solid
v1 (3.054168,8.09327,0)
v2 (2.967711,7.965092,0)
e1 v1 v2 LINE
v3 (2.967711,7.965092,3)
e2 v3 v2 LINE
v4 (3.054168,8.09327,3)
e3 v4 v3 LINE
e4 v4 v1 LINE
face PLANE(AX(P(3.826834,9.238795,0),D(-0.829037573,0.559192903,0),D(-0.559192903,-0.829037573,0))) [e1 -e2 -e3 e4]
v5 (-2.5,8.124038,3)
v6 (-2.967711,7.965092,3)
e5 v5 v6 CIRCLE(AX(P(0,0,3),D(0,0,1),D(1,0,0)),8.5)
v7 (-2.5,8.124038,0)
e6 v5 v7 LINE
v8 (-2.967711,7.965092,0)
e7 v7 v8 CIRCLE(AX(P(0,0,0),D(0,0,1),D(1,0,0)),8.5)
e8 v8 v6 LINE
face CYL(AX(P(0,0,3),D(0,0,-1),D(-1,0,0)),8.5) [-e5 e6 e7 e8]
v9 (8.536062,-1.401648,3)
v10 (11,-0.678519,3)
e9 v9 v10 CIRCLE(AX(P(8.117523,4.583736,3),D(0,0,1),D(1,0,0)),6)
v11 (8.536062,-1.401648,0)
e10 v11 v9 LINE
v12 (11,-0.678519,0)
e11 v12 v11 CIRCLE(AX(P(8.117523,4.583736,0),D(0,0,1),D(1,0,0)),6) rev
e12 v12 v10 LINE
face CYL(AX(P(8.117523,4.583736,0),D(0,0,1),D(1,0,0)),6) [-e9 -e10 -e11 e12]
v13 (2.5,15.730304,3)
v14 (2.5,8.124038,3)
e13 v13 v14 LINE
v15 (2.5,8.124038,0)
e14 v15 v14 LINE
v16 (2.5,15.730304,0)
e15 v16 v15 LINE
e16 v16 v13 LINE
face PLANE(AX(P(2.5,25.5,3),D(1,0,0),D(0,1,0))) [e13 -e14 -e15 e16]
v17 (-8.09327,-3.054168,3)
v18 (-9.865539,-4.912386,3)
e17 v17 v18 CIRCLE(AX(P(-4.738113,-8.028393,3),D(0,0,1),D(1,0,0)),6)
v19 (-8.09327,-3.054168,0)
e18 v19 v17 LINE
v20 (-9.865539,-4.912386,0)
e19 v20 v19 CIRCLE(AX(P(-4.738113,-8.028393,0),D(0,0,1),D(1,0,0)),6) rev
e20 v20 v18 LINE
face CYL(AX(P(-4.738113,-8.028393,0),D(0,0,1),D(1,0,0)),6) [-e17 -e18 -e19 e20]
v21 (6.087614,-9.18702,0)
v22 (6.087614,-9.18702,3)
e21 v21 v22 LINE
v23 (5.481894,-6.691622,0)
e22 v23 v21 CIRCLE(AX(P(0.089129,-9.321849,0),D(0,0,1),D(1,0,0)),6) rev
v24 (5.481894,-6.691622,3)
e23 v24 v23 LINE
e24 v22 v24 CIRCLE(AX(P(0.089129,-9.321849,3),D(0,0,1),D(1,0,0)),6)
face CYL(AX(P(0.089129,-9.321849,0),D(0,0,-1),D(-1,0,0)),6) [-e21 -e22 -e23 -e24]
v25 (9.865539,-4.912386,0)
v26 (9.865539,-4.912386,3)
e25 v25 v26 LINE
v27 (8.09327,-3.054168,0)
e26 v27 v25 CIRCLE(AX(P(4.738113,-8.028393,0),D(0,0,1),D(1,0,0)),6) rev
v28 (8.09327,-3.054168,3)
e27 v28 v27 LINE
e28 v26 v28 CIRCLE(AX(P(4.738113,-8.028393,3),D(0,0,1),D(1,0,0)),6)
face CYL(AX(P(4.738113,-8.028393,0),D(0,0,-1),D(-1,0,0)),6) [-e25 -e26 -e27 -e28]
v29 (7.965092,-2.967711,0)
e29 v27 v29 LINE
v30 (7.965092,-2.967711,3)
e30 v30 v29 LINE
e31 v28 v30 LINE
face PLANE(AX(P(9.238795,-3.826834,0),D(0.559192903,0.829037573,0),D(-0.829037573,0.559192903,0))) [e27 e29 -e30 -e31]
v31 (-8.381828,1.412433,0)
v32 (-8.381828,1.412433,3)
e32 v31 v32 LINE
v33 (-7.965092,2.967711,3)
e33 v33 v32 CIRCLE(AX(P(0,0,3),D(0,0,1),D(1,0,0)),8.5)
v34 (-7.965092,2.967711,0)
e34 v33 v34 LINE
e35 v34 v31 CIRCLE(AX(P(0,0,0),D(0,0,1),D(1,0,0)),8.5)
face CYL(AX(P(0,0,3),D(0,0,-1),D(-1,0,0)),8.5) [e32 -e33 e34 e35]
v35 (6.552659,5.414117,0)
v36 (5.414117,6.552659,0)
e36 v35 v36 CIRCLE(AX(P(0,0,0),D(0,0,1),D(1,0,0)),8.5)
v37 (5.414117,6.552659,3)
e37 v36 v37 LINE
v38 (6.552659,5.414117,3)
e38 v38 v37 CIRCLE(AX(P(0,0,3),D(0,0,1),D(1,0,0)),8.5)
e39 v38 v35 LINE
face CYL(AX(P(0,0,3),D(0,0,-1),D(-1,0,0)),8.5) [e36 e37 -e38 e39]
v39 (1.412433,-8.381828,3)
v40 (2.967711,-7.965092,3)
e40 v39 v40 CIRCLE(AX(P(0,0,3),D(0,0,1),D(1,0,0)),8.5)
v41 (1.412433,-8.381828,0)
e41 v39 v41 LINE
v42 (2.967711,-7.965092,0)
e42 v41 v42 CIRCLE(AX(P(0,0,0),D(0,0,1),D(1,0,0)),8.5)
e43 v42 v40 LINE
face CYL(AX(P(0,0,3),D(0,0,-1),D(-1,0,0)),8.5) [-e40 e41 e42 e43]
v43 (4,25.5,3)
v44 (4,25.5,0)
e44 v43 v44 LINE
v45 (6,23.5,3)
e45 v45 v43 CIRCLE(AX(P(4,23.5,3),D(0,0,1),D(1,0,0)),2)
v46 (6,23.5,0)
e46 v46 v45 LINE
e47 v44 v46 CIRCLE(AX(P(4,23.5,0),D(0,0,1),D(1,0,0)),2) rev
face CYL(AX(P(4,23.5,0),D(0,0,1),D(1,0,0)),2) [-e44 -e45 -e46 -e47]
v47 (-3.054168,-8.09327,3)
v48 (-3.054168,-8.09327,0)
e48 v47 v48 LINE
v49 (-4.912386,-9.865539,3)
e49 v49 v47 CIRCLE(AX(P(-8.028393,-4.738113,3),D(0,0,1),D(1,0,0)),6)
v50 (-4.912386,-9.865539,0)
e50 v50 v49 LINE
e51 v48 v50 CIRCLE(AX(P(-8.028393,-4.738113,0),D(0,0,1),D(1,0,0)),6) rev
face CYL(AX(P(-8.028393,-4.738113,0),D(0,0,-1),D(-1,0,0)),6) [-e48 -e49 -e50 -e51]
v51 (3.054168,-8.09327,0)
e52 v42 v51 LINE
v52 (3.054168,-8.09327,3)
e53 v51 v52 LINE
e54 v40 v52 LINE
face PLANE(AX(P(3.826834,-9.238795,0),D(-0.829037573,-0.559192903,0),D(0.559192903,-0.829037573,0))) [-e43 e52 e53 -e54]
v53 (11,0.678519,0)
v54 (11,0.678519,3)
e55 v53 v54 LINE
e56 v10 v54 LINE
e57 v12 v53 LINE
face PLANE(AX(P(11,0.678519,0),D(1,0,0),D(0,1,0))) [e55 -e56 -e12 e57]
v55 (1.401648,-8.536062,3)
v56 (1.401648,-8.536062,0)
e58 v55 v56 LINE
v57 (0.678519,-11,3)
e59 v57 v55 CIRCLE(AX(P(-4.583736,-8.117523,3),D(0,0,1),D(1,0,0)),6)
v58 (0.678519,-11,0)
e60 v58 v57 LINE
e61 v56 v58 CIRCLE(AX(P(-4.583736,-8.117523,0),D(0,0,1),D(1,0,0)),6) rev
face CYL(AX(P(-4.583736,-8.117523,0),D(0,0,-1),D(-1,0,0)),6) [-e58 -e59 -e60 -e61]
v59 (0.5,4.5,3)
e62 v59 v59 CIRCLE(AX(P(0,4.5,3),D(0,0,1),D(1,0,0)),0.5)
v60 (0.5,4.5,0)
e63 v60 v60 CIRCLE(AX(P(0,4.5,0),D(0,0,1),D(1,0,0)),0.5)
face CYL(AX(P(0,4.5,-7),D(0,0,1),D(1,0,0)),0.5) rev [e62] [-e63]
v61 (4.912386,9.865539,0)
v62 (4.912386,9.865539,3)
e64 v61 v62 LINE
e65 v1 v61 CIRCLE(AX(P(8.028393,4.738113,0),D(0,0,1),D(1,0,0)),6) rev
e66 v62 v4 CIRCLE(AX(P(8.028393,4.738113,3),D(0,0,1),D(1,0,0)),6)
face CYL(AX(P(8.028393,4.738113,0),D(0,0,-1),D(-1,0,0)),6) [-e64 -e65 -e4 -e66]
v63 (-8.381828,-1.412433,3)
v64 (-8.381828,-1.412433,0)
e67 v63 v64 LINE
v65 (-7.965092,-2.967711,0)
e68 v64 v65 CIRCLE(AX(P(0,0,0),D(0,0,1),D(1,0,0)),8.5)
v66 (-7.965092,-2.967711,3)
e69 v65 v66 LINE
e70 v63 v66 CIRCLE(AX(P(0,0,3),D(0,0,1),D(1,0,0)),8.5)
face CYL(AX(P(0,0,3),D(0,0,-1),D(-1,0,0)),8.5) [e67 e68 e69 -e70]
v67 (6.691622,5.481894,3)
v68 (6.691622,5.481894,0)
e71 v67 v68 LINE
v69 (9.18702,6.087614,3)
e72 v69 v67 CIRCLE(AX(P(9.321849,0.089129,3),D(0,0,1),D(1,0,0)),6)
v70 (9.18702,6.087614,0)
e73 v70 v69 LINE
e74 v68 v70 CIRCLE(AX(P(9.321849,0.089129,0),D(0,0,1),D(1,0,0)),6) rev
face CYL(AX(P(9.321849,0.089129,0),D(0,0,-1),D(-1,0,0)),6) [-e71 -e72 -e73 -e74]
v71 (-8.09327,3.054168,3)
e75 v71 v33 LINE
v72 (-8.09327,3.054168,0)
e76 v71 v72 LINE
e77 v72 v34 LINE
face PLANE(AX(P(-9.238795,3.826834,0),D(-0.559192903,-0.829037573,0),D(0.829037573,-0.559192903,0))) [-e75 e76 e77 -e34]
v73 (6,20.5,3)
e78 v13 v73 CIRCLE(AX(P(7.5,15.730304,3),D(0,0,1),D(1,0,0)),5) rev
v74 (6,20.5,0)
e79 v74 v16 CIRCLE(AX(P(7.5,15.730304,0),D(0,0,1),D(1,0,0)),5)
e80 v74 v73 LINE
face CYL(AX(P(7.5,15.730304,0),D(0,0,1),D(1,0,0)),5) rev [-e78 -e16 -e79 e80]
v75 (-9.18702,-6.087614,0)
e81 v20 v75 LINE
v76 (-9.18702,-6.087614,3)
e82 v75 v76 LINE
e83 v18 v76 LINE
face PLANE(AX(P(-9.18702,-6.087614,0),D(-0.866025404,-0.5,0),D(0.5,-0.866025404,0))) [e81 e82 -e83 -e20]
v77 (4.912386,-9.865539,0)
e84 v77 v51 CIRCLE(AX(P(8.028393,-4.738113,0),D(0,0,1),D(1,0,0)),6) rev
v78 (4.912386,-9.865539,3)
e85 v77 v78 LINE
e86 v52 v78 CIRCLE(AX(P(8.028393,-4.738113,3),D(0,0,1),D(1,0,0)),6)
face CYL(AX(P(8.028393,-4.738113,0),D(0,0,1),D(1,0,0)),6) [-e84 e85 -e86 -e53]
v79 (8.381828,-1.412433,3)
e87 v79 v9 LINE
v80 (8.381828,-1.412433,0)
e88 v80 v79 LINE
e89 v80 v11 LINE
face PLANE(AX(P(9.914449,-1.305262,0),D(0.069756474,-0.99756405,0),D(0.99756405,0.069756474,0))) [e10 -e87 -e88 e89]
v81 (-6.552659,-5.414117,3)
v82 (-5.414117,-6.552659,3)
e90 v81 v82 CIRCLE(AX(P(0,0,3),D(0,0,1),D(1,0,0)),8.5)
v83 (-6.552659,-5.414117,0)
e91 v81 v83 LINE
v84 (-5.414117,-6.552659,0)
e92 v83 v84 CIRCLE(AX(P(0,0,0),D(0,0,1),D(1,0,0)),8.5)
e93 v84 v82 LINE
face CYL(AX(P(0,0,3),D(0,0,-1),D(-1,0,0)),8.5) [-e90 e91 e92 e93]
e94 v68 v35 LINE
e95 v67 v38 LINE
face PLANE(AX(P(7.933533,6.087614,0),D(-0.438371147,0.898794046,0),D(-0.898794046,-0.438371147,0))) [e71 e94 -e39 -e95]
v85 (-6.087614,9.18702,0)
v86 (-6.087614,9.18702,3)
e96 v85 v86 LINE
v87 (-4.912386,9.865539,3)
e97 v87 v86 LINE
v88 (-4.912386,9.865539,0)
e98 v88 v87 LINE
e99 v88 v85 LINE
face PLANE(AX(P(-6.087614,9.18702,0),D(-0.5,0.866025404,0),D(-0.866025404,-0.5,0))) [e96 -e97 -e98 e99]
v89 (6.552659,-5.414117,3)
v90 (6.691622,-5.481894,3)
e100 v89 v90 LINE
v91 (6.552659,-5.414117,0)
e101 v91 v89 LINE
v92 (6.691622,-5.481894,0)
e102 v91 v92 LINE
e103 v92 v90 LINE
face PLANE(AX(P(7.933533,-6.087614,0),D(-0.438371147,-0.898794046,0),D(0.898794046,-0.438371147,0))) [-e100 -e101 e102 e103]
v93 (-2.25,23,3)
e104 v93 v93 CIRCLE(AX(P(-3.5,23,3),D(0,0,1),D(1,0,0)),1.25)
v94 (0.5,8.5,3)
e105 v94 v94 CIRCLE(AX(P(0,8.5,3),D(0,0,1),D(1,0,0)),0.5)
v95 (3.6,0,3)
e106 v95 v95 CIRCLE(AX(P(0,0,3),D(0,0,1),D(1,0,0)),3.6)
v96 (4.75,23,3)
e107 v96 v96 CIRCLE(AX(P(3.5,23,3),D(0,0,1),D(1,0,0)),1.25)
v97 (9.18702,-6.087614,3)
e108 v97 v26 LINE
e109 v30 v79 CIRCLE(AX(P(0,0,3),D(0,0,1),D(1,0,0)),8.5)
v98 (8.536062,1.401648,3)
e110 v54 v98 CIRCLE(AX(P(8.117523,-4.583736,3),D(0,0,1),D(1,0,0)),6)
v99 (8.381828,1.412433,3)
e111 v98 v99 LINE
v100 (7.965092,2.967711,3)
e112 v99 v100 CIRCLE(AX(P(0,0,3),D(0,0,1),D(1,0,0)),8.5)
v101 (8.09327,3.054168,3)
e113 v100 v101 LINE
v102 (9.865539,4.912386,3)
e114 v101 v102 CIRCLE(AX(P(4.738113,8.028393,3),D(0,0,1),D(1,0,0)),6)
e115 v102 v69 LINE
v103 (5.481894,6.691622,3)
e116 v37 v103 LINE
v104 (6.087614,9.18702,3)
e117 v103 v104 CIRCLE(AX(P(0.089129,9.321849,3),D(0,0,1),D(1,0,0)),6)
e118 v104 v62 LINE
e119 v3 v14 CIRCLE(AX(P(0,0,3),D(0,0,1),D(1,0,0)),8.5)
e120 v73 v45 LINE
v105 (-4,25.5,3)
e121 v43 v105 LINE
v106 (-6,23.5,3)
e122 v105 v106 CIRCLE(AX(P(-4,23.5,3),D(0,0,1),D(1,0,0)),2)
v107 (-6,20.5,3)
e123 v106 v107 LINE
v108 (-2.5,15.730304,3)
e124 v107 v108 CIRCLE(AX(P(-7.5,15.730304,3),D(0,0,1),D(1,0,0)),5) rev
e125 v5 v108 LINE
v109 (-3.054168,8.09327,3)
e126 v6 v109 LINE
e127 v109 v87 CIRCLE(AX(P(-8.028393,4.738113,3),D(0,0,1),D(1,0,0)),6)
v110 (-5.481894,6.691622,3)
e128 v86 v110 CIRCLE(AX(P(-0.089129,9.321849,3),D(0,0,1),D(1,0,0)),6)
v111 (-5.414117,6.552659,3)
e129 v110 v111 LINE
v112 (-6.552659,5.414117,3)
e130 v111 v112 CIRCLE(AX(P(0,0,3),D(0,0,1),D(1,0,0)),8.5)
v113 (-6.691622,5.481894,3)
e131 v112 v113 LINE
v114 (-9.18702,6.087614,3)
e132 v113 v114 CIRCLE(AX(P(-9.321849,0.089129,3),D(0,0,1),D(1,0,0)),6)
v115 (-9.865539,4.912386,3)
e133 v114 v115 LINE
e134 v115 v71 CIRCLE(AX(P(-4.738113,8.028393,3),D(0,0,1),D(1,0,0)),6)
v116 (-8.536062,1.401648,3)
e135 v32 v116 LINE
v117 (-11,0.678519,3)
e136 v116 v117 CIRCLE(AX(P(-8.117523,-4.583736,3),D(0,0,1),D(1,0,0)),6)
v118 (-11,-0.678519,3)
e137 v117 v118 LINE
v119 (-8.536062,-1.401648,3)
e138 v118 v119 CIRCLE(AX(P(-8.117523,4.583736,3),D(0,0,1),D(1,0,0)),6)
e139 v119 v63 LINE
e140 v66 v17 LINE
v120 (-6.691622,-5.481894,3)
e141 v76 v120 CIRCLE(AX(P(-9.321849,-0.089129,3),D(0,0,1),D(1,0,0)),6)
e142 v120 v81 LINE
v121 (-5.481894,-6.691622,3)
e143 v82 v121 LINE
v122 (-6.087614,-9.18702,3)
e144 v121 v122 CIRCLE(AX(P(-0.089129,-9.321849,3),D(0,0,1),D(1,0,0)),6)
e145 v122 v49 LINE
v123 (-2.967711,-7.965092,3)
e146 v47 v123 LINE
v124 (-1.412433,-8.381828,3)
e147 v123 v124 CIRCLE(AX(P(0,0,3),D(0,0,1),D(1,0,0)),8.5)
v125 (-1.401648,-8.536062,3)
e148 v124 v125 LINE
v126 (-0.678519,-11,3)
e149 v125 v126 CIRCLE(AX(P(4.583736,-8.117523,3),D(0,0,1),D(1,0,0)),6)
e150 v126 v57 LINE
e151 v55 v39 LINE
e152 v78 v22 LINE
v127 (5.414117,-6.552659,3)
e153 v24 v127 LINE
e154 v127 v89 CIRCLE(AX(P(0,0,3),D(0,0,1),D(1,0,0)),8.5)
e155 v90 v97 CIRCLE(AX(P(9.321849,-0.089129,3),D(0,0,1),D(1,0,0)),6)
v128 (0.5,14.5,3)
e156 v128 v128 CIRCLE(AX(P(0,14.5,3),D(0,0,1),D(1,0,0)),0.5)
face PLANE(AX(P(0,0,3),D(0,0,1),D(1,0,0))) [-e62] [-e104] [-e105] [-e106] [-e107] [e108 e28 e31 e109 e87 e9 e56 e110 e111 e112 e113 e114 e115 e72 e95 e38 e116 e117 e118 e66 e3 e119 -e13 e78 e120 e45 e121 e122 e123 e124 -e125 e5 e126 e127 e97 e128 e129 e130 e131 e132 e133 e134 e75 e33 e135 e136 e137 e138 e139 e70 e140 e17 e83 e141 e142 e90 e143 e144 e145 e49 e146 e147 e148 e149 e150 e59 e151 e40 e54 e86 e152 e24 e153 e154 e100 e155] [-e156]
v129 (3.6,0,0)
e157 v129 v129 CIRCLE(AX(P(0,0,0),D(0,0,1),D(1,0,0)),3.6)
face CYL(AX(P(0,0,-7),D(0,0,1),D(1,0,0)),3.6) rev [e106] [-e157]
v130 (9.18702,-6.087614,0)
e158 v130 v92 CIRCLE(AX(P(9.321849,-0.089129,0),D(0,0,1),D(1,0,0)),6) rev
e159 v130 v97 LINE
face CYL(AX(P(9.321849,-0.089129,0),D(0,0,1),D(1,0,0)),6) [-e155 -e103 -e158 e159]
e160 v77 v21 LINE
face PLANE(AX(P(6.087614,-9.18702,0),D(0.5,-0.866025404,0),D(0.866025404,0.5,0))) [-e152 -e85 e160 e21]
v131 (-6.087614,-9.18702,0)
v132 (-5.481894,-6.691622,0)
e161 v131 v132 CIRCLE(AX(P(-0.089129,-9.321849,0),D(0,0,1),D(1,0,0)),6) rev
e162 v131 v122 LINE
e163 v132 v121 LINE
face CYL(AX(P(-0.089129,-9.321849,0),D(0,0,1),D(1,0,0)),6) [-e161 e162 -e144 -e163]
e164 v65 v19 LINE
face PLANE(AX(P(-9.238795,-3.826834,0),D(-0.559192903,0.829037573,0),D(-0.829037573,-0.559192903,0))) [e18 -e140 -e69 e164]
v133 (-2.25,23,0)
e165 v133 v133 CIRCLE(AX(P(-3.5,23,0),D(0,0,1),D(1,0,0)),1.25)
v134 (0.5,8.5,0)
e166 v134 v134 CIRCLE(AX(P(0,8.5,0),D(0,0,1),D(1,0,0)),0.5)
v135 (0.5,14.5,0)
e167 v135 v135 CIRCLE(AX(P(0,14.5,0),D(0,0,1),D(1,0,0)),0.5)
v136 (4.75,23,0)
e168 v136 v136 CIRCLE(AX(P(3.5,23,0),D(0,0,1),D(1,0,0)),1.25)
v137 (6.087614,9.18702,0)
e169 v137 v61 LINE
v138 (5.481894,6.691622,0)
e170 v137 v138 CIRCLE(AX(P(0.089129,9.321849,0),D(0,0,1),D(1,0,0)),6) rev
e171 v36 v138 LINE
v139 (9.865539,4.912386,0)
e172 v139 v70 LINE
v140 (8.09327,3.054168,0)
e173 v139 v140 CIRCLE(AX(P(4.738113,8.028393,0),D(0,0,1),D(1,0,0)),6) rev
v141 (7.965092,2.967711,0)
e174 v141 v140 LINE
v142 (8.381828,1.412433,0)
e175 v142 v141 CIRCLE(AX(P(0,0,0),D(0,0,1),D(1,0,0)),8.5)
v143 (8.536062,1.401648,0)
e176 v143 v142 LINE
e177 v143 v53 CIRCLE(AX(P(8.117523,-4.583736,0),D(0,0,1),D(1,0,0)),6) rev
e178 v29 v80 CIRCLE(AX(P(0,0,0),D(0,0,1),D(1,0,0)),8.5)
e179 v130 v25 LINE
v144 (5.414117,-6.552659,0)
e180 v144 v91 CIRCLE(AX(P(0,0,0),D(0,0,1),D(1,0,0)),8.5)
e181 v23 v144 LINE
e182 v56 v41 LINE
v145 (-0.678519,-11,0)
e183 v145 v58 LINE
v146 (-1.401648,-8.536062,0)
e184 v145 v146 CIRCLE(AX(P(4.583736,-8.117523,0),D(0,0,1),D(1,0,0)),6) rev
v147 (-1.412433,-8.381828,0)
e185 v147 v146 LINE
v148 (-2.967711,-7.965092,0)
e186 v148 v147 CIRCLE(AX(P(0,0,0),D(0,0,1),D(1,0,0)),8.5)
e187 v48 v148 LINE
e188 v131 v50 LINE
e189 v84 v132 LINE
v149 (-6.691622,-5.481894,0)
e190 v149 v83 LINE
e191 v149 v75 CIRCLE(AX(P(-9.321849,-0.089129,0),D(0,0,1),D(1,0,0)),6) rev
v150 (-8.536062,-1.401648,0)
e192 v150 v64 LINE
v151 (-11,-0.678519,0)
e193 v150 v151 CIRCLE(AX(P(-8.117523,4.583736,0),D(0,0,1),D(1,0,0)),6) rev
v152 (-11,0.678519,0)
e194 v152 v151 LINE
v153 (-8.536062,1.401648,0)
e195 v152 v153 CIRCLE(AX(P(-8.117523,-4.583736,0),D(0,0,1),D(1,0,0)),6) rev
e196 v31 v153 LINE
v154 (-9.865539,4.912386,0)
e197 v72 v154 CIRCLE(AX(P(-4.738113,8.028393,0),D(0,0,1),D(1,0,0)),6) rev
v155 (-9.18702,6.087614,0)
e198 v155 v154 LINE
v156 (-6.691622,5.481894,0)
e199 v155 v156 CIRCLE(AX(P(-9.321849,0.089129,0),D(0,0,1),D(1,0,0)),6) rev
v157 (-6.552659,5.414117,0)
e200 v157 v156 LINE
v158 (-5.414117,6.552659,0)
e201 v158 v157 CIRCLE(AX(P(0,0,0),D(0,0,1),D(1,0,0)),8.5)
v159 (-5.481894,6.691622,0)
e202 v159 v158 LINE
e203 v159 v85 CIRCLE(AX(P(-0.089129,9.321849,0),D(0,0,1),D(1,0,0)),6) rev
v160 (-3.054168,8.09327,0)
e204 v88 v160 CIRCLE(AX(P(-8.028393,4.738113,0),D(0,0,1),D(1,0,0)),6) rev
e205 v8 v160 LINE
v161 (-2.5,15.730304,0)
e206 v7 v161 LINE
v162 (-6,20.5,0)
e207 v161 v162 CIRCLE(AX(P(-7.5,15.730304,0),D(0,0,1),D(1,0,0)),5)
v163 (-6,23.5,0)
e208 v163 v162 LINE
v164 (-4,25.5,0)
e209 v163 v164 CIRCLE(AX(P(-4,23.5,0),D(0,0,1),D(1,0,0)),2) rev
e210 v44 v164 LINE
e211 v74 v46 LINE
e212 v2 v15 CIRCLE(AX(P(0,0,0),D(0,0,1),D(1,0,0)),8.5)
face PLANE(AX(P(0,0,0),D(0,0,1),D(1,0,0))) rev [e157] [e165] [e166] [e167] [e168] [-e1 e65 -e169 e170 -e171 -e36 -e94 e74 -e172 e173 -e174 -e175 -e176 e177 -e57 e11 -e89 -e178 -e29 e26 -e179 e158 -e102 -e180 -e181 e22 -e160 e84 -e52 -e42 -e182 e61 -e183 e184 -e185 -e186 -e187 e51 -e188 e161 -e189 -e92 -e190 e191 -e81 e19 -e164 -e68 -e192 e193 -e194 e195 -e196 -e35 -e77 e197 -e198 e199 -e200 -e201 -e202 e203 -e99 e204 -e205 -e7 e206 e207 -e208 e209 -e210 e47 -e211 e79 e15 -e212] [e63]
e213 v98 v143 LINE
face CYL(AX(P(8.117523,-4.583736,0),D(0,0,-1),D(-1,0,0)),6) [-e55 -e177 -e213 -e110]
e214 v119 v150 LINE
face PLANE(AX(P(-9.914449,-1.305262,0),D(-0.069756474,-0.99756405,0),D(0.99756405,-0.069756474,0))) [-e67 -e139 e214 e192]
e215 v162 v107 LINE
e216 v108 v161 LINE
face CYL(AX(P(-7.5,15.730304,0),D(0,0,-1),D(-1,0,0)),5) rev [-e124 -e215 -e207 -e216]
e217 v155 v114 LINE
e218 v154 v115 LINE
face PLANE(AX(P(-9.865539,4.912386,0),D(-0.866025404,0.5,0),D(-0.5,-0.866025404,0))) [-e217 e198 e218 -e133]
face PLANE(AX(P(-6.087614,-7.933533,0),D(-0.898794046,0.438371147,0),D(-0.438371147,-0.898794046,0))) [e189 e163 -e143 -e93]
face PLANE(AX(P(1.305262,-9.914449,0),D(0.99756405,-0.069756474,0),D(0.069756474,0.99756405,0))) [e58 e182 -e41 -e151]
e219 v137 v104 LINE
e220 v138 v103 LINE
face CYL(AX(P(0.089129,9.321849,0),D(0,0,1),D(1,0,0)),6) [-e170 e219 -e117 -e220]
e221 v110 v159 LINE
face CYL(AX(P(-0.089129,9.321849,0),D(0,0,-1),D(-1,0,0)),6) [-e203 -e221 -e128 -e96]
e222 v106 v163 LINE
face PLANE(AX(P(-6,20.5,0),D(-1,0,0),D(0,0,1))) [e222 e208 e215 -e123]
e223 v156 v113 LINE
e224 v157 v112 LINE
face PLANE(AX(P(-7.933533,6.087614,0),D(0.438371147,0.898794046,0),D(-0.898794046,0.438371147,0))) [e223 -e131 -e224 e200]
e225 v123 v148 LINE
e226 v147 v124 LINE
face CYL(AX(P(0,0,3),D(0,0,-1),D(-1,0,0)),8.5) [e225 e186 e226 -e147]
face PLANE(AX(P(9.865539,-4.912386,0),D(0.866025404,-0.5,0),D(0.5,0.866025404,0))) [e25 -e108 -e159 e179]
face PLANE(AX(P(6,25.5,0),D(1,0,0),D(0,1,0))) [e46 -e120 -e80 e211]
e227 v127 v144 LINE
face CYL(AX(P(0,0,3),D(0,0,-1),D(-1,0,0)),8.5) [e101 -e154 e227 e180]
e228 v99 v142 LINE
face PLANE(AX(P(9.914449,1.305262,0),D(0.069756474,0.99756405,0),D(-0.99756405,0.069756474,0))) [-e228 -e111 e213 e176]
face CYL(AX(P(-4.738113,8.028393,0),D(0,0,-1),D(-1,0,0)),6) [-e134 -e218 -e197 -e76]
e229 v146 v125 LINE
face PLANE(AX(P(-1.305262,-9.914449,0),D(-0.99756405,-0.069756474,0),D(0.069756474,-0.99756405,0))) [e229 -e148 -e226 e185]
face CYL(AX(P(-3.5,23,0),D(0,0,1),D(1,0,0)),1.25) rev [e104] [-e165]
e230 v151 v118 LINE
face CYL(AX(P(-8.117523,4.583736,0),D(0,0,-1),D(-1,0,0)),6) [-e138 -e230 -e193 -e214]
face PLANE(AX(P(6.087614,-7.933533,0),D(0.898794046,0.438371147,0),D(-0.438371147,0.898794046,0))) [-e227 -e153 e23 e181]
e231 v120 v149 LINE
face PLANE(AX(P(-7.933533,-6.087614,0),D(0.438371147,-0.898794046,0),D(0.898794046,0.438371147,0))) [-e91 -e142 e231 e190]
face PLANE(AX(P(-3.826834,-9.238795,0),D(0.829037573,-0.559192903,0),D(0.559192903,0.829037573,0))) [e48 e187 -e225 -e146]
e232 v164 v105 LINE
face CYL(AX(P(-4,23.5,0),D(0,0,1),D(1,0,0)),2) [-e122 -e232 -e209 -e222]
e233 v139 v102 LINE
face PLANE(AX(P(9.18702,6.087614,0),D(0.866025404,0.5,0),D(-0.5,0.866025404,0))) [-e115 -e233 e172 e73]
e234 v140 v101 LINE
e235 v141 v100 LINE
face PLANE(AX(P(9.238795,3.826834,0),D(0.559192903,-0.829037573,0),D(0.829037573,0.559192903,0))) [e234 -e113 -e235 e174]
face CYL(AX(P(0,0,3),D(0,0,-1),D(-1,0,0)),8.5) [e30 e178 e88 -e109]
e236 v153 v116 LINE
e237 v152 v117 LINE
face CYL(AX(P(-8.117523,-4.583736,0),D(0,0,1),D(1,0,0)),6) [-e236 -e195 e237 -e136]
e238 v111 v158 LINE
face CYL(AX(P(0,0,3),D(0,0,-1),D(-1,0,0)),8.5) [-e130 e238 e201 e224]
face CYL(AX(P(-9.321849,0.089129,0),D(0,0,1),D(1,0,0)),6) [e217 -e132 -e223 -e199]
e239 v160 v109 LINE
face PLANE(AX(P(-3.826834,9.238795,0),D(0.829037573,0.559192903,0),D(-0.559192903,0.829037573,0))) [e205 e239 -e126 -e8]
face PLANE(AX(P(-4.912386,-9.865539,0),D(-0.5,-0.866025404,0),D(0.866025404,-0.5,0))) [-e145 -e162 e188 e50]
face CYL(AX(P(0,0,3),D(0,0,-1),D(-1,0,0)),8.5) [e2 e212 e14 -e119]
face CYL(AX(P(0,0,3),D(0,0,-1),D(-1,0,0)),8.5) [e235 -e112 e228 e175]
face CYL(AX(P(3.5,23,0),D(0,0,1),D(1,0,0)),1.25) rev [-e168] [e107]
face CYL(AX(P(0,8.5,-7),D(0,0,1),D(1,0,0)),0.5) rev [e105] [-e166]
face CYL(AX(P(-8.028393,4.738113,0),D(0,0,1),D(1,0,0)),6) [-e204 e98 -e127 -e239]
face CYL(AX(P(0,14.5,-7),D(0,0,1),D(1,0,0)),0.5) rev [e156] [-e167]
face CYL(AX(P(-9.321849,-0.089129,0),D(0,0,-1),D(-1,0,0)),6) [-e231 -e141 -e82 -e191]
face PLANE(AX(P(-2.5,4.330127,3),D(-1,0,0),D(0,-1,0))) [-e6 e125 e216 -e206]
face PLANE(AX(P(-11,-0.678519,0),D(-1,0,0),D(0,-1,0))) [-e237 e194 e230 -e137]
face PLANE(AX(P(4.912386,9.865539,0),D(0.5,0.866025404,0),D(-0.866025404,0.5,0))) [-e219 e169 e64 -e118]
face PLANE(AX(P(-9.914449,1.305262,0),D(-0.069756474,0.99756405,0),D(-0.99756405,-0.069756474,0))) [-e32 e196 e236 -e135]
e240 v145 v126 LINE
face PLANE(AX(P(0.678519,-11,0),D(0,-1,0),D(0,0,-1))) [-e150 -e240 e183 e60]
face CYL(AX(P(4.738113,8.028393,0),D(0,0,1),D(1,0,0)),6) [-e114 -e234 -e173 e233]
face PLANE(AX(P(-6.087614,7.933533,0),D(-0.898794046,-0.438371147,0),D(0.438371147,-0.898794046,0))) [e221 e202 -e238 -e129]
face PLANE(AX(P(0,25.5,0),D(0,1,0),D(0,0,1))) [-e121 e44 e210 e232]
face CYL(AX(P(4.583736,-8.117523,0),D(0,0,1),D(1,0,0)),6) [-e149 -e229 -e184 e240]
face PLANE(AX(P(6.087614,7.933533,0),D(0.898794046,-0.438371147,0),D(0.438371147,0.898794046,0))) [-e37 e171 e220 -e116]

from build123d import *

# Parameters (mm, degrees)
SKETCH1_R           = 8.5
BOSS_EXTRUDE1_DEPTH = 3
BOSS_EXTRUDE2_DEPTH = 3
CIRPATTERN2_COUNT   = 12
FILLET5_R           = 6
FILLET6_R           = 6
BOSS_EXTRUDE3_DEPTH = 3
FILLET9_R           = 2.5
SKETCH20_R          = 3.6
CUT_EXTRUDE11_DEPTH = 10
SKETCH21_R          = 0.5
CUT_EXTRUDE12_DEPTH = 10
BOSS_EXTRUDE4_DEPTH = 3
SKETCH23_R          = 1.25
CUT_EXTRUDE13_DEPTH = 3
FILLET10_R          = 5
FILLET11_R          = 2


# Some blends are built 0.0001 mm under size
with BuildPart() as part:
    # Sketch1 → Boss-Extrude1 (new body)
    with BuildSketch(Plane.XY):
        Circle(SKETCH1_R)
    extrude(amount=BOSS_EXTRUDE1_DEPTH)

    # Sketch3 → Boss-Extrude2 (add)
    with BuildSketch(Plane.XY.offset(3)):
        Polygon((-1.305261922, 9.914448614), (-1.509060022, 7), (1.509060022, 7), (1.305261922, 9.914448614), (0.678518537, 11), (-0.678518537, 11), align=None)
    boss_extrude2 = extrude(amount=-BOSS_EXTRUDE2_DEPTH)

    # CirPattern2: Boss-Extrude2 ×12 about axis
    cirpattern2_axis = Axis((0, 0, 0), (0, 0, 1))
    for i in range(1, CIRPATTERN2_COUNT):
        add(boss_extrude2.rotate(cirpattern2_axis, i * 360 / CIRPATTERN2_COUNT))

    # Fillet5
    # the kernel refuses this fillet: 6 mm, written as the material it takes off along each edge
    with BuildSketch(Plane(origin=(9.238795325, 3.826834324, 6.454382408), x_dir=(0.4999999999998129, 0.8660254037845467, 0), z_dir=(0, 0, -1)), Plane(origin=(1.305261922, 9.914448614, 6.454382408), x_dir=(-0.5000000000001841, 0.8660254037843323, 0), z_dir=(0, 0, -1)), Plane(origin=(-7.933533403, 6.08761429, 6.454382408), x_dir=(-1, 0, 0), z_dir=(0, 0, -1)), Plane(origin=(-9.914448614, 1.305261922, 6.454382408), x_dir=(-0.8660254037843317, -0.5000000000001852, 0), z_dir=(0, 0, -1)), Plane(origin=(-9.238795325, -3.826834324, 6.454382408), x_dir=(-0.49999999999981826, -0.8660254037845436, 0), z_dir=(0, 0, -1)), Plane(origin=(-6.08761429, -7.933533403, 6.454382408), x_dir=(0, -1, 0), z_dir=(0, 0, -1)), Plane(origin=(3.826834324, -9.238795325, 6.454382408), x_dir=(0.866025403784545, -0.49999999999981576, 0), z_dir=(0, 0, -1)), Plane(origin=(7.933533403, -6.08761429, 6.454382408), x_dir=(1, 0, 0), z_dir=(0, 0, -1)), Plane(origin=(9.914448614, -1.305261922, 6.454382408), x_dir=(0.8660254037843321, 0.5000000000001844, 0), z_dir=(0, 0, -1))) as fillet5_piece_1:
        with BuildLine():
            CenterArc((1.388315544, -5.998484909), FILLET5_R, 91.287628333, 24.712371667)
            Line((-1.241911337, -0.605720631), (-1.294515874, -0.497865346))
            Line((-1.294515874, -0.497865346), (-0.052604538, 0.107855286))
            Line((-0.052604538, 0.107855286), (0, 0.12))
            ThreePointArc((0, 0.12), (0.626743385, 0.12), (1.250790195, 0.119969698))
            Line((1.250790195, 0.119969698), (1.25348677, 0))
        make_face()
    extrude(amount=9.908764816, mode=Mode.SUBTRACT)
    with BuildSketch(Plane(origin=(6.08761429, 7.933533403, 6.454382408), x_dir=(-0.4383711467890806, -0.8987940462991654, 0), z_dir=(0, 0, -1)), Plane(origin=(-3.826834324, 9.238795325, 6.454382408), x_dir=(0.5591929034707435, -0.8290375725550441, 0), z_dir=(0, 0, -1)), Plane(origin=(-1.305261922, -9.914448614, 6.454382408), x_dir=(-0.06975647374412178, 0.9975640502598244, 0), z_dir=(0, 0, -1))) as fillet5_piece_2:
        with BuildLine():
            CenterArc((1.381752963, 6), FILLET5_R, 245.287628333, 24.712371667)
            Line((-1.126626446, 0.549492433), (-1.176794034, 0.440482282))
            ThreePointArc((-1.176794034, 0.440482282), (-0.615917761, 0.166890931), (-0.052604538, -0.107855286))
            Line((-0.052604538, -0.107855286), (0, -0.12))
            Line((0, -0.12), (1.381752963, -0.12))
            Line((1.381752963, -0.12), (1.381752963, 0))
        make_face()
    extrude(amount=9.908764816, mode=Mode.SUBTRACT)

    # Fillet6
    # the kernel refuses this fillet: 6 mm, written as the material it takes off along each edge
    with BuildSketch(Plane(origin=(7.933533403, 6.08761429, 6.454382408), x_dir=(-0.8987940462991681, -0.4383711467890748, 0), z_dir=(0, 0, -1)), Plane(origin=(3.826834324, 9.238795325, 6.454382408), x_dir=(-0.5591929034707512, -0.8290375725550386, 0), z_dir=(0, 0, -1)), Plane(origin=(-1.305261922, 9.914448614, 6.454382408), x_dir=(-0.06975647374412959, -0.9975640502598239, 0), z_dir=(0, 0, -1)), Plane(origin=(-6.08761429, 7.933533403, 6.454382408), x_dir=(0.43837114678907496, -0.8987940462991681, 0), z_dir=(0, 0, -1)), Plane(origin=(-9.238795325, 3.826834324, 6.454382408), x_dir=(0.8290375725550394, -0.5591929034707502, 0), z_dir=(0, 0, -1)), Plane(origin=(-9.914448614, -1.305261922, 6.454382408), x_dir=(0.9975640502598241, -0.06975647374412908, 0), z_dir=(0, 0, -1)), Plane(origin=(-7.933533403, -6.08761429, 6.454382408), x_dir=(0.8987940462991686, 0.4383711467890744, 0), z_dir=(0, 0, -1)), Plane(origin=(-3.826834324, -9.238795325, 6.454382408), x_dir=(0.559192903470749, 0.8290375725550401, 0), z_dir=(0, 0, -1)), Plane(origin=(1.305261922, -9.914448614, 6.454382408), x_dir=(0.06975647374412973, 0.9975640502598241, 0), z_dir=(0, 0, -1)), Plane(origin=(6.08761429, -7.933533403, 6.454382408), x_dir=(-0.4383711467890742, 0.8987940462991686, 0), z_dir=(0, 0, -1)), Plane(origin=(9.238795325, -3.826834324, 6.454382408), x_dir=(-0.8290375725550386, 0.5591929034707512, 0), z_dir=(0, 0, -1)), Plane(origin=(9.914448614, 1.305261922, 6.454382408), x_dir=(-0.9975640502598239, 0.06975647374412945, 0), z_dir=(0, 0, -1))) as fillet6_piece_1:
        with BuildLine():
            CenterArc((1.381752963, -6), FILLET6_R, 90, 24.712371667)
            Line((-1.126626446, -0.549492433), (-1.176794034, -0.440482282))
            ThreePointArc((-1.176794034, -0.440482282), (-0.615917761, -0.166890931), (-0.052604538, 0.107855286))
            Line((-0.052604538, 0.107855286), (0, 0.12))
            Line((0, 0.12), (1.381752963, 0.12))
            Line((1.381752963, 0.12), (1.381752963, 0))
        make_face()
    extrude(amount=9.908764816, mode=Mode.SUBTRACT)

    # Sketch4 → Boss-Extrude3 (add)
    with BuildSketch(Plane(origin=(0, 0, 0), x_dir=(-1, 0, 0), z_dir=(0, 0, -1))):
        with BuildLine():
            Line((-2.5, 25.5), (-2.5, 4.330127019))
            ThreePointArc((-2.5, 4.330127019), (-5, 0), (-2.5, -4.330127019))
            Line((-2.5, -4.330127019), (-2.5, -7))
            Line((-2.5, -7), (2.5, -7))
            Line((2.5, -7), (2.5, -4.330127019))
            ThreePointArc((2.5, -4.330127019), (5, 0), (2.5, 4.330127019))
            Line((2.5, 4.330127019), (2.5, 25.5))
            Line((2.5, 25.5), (-2.5, 25.5))
        make_face()
    extrude(amount=-BOSS_EXTRUDE3_DEPTH)

    # Fillet9
    fillet9_edges = [part.edges().sort_by_distance(p)[0] for p in [
        (-2.5, 25.5, 1.5),
        (2.5, 25.5, 1.5),
    ]]
    fillet(fillet9_edges, radius=FILLET9_R - 0.0001)  # a hair under: the kernel refuses the full size

    # Sketch20 → Cut-Extrude11 (cut)
    with BuildSketch(Plane.XY.offset(3)):
        Circle(SKETCH20_R)
    extrude(amount=-CUT_EXTRUDE11_DEPTH, mode=Mode.SUBTRACT)

    # Sketch21 → Cut-Extrude12 (cut)
    with BuildSketch(Plane.XY.offset(3)):
        with Locations((0, 14.5)):
            Circle(SKETCH21_R)
        with Locations((0, 4.5)):
            Circle(SKETCH21_R)
        with Locations((0, 8.5)):
            Circle(SKETCH21_R)
    extrude(amount=-CUT_EXTRUDE12_DEPTH, mode=Mode.SUBTRACT)

    # Sketch22 → Boss-Extrude4 (add)
    with BuildSketch(Plane.XY.offset(3)):
        Polygon((0, 25.5), (6, 25.5), (6, 20.5), (-6, 20.5), (-6, 25.5), align=None)
    extrude(amount=-BOSS_EXTRUDE4_DEPTH)

    # Sketch23 → Cut-Extrude13 (cut)
    with BuildSketch(Plane.XY.offset(3)):
        with Locations((-3.5, 23)):
            Circle(SKETCH23_R)
        with Locations((3.5, 23)):
            Circle(SKETCH23_R)
    extrude(amount=-CUT_EXTRUDE13_DEPTH, mode=Mode.SUBTRACT)

    # Fillet10
    # the kernel refuses this fillet: 5 mm, written as the material it adds along each edge
    with BuildSketch(Plane(origin=(2.5, 20.5, 0), x_dir=(1, 0, 0), z_dir=(0, 0, 1))) as fillet10_piece_1:
        with BuildLine():
            CenterArc((5, -4.769696007), FILLET10_R, 107.457603124, 72.542396876)
            Line((0, -4.769696007), (-0.1, -4.769696007))
            Line((-0.1, -4.769696007), (-0.1, 0))
            Line((-0.1, 0), (0, 0.1))
            ThreePointArc((0, 0.1), (1.75, 0.1), (3.47, 0.09539392))
            Line((3.47, 0.09539392), (3.5, 0))
        make_face()
    extrude(amount=3)
    with BuildSketch(Plane(origin=(-2.5, 20.5, 3), x_dir=(0, -1, 0), z_dir=(0, 0, -1))) as fillet10_piece_2:
        with BuildLine():
            CenterArc((4.769696007, 5), FILLET10_R, 197.457603124, 72.542396876)
            Line((0, 3.5), (-0.09539392, 3.47))
            ThreePointArc((-0.09539392, 3.47), (-0.1, 1.75), (-0.1, 0))
            Line((-0.1, 0), (0, -0.1))
            Line((0, -0.1), (4.769696007, -0.1))
            Line((4.769696007, -0.1), (4.769696007, 0))
        make_face()
    extrude(amount=3)

    # Fillet11
    fillet11_edges = [part.edges().sort_by_distance(p)[0] for p in [
        (-6, 25.5, 1.5),
        (6, 25.5, 1.5),
    ]]
    fillet(fillet11_edges, radius=FILLET11_R)


solid = part.part
